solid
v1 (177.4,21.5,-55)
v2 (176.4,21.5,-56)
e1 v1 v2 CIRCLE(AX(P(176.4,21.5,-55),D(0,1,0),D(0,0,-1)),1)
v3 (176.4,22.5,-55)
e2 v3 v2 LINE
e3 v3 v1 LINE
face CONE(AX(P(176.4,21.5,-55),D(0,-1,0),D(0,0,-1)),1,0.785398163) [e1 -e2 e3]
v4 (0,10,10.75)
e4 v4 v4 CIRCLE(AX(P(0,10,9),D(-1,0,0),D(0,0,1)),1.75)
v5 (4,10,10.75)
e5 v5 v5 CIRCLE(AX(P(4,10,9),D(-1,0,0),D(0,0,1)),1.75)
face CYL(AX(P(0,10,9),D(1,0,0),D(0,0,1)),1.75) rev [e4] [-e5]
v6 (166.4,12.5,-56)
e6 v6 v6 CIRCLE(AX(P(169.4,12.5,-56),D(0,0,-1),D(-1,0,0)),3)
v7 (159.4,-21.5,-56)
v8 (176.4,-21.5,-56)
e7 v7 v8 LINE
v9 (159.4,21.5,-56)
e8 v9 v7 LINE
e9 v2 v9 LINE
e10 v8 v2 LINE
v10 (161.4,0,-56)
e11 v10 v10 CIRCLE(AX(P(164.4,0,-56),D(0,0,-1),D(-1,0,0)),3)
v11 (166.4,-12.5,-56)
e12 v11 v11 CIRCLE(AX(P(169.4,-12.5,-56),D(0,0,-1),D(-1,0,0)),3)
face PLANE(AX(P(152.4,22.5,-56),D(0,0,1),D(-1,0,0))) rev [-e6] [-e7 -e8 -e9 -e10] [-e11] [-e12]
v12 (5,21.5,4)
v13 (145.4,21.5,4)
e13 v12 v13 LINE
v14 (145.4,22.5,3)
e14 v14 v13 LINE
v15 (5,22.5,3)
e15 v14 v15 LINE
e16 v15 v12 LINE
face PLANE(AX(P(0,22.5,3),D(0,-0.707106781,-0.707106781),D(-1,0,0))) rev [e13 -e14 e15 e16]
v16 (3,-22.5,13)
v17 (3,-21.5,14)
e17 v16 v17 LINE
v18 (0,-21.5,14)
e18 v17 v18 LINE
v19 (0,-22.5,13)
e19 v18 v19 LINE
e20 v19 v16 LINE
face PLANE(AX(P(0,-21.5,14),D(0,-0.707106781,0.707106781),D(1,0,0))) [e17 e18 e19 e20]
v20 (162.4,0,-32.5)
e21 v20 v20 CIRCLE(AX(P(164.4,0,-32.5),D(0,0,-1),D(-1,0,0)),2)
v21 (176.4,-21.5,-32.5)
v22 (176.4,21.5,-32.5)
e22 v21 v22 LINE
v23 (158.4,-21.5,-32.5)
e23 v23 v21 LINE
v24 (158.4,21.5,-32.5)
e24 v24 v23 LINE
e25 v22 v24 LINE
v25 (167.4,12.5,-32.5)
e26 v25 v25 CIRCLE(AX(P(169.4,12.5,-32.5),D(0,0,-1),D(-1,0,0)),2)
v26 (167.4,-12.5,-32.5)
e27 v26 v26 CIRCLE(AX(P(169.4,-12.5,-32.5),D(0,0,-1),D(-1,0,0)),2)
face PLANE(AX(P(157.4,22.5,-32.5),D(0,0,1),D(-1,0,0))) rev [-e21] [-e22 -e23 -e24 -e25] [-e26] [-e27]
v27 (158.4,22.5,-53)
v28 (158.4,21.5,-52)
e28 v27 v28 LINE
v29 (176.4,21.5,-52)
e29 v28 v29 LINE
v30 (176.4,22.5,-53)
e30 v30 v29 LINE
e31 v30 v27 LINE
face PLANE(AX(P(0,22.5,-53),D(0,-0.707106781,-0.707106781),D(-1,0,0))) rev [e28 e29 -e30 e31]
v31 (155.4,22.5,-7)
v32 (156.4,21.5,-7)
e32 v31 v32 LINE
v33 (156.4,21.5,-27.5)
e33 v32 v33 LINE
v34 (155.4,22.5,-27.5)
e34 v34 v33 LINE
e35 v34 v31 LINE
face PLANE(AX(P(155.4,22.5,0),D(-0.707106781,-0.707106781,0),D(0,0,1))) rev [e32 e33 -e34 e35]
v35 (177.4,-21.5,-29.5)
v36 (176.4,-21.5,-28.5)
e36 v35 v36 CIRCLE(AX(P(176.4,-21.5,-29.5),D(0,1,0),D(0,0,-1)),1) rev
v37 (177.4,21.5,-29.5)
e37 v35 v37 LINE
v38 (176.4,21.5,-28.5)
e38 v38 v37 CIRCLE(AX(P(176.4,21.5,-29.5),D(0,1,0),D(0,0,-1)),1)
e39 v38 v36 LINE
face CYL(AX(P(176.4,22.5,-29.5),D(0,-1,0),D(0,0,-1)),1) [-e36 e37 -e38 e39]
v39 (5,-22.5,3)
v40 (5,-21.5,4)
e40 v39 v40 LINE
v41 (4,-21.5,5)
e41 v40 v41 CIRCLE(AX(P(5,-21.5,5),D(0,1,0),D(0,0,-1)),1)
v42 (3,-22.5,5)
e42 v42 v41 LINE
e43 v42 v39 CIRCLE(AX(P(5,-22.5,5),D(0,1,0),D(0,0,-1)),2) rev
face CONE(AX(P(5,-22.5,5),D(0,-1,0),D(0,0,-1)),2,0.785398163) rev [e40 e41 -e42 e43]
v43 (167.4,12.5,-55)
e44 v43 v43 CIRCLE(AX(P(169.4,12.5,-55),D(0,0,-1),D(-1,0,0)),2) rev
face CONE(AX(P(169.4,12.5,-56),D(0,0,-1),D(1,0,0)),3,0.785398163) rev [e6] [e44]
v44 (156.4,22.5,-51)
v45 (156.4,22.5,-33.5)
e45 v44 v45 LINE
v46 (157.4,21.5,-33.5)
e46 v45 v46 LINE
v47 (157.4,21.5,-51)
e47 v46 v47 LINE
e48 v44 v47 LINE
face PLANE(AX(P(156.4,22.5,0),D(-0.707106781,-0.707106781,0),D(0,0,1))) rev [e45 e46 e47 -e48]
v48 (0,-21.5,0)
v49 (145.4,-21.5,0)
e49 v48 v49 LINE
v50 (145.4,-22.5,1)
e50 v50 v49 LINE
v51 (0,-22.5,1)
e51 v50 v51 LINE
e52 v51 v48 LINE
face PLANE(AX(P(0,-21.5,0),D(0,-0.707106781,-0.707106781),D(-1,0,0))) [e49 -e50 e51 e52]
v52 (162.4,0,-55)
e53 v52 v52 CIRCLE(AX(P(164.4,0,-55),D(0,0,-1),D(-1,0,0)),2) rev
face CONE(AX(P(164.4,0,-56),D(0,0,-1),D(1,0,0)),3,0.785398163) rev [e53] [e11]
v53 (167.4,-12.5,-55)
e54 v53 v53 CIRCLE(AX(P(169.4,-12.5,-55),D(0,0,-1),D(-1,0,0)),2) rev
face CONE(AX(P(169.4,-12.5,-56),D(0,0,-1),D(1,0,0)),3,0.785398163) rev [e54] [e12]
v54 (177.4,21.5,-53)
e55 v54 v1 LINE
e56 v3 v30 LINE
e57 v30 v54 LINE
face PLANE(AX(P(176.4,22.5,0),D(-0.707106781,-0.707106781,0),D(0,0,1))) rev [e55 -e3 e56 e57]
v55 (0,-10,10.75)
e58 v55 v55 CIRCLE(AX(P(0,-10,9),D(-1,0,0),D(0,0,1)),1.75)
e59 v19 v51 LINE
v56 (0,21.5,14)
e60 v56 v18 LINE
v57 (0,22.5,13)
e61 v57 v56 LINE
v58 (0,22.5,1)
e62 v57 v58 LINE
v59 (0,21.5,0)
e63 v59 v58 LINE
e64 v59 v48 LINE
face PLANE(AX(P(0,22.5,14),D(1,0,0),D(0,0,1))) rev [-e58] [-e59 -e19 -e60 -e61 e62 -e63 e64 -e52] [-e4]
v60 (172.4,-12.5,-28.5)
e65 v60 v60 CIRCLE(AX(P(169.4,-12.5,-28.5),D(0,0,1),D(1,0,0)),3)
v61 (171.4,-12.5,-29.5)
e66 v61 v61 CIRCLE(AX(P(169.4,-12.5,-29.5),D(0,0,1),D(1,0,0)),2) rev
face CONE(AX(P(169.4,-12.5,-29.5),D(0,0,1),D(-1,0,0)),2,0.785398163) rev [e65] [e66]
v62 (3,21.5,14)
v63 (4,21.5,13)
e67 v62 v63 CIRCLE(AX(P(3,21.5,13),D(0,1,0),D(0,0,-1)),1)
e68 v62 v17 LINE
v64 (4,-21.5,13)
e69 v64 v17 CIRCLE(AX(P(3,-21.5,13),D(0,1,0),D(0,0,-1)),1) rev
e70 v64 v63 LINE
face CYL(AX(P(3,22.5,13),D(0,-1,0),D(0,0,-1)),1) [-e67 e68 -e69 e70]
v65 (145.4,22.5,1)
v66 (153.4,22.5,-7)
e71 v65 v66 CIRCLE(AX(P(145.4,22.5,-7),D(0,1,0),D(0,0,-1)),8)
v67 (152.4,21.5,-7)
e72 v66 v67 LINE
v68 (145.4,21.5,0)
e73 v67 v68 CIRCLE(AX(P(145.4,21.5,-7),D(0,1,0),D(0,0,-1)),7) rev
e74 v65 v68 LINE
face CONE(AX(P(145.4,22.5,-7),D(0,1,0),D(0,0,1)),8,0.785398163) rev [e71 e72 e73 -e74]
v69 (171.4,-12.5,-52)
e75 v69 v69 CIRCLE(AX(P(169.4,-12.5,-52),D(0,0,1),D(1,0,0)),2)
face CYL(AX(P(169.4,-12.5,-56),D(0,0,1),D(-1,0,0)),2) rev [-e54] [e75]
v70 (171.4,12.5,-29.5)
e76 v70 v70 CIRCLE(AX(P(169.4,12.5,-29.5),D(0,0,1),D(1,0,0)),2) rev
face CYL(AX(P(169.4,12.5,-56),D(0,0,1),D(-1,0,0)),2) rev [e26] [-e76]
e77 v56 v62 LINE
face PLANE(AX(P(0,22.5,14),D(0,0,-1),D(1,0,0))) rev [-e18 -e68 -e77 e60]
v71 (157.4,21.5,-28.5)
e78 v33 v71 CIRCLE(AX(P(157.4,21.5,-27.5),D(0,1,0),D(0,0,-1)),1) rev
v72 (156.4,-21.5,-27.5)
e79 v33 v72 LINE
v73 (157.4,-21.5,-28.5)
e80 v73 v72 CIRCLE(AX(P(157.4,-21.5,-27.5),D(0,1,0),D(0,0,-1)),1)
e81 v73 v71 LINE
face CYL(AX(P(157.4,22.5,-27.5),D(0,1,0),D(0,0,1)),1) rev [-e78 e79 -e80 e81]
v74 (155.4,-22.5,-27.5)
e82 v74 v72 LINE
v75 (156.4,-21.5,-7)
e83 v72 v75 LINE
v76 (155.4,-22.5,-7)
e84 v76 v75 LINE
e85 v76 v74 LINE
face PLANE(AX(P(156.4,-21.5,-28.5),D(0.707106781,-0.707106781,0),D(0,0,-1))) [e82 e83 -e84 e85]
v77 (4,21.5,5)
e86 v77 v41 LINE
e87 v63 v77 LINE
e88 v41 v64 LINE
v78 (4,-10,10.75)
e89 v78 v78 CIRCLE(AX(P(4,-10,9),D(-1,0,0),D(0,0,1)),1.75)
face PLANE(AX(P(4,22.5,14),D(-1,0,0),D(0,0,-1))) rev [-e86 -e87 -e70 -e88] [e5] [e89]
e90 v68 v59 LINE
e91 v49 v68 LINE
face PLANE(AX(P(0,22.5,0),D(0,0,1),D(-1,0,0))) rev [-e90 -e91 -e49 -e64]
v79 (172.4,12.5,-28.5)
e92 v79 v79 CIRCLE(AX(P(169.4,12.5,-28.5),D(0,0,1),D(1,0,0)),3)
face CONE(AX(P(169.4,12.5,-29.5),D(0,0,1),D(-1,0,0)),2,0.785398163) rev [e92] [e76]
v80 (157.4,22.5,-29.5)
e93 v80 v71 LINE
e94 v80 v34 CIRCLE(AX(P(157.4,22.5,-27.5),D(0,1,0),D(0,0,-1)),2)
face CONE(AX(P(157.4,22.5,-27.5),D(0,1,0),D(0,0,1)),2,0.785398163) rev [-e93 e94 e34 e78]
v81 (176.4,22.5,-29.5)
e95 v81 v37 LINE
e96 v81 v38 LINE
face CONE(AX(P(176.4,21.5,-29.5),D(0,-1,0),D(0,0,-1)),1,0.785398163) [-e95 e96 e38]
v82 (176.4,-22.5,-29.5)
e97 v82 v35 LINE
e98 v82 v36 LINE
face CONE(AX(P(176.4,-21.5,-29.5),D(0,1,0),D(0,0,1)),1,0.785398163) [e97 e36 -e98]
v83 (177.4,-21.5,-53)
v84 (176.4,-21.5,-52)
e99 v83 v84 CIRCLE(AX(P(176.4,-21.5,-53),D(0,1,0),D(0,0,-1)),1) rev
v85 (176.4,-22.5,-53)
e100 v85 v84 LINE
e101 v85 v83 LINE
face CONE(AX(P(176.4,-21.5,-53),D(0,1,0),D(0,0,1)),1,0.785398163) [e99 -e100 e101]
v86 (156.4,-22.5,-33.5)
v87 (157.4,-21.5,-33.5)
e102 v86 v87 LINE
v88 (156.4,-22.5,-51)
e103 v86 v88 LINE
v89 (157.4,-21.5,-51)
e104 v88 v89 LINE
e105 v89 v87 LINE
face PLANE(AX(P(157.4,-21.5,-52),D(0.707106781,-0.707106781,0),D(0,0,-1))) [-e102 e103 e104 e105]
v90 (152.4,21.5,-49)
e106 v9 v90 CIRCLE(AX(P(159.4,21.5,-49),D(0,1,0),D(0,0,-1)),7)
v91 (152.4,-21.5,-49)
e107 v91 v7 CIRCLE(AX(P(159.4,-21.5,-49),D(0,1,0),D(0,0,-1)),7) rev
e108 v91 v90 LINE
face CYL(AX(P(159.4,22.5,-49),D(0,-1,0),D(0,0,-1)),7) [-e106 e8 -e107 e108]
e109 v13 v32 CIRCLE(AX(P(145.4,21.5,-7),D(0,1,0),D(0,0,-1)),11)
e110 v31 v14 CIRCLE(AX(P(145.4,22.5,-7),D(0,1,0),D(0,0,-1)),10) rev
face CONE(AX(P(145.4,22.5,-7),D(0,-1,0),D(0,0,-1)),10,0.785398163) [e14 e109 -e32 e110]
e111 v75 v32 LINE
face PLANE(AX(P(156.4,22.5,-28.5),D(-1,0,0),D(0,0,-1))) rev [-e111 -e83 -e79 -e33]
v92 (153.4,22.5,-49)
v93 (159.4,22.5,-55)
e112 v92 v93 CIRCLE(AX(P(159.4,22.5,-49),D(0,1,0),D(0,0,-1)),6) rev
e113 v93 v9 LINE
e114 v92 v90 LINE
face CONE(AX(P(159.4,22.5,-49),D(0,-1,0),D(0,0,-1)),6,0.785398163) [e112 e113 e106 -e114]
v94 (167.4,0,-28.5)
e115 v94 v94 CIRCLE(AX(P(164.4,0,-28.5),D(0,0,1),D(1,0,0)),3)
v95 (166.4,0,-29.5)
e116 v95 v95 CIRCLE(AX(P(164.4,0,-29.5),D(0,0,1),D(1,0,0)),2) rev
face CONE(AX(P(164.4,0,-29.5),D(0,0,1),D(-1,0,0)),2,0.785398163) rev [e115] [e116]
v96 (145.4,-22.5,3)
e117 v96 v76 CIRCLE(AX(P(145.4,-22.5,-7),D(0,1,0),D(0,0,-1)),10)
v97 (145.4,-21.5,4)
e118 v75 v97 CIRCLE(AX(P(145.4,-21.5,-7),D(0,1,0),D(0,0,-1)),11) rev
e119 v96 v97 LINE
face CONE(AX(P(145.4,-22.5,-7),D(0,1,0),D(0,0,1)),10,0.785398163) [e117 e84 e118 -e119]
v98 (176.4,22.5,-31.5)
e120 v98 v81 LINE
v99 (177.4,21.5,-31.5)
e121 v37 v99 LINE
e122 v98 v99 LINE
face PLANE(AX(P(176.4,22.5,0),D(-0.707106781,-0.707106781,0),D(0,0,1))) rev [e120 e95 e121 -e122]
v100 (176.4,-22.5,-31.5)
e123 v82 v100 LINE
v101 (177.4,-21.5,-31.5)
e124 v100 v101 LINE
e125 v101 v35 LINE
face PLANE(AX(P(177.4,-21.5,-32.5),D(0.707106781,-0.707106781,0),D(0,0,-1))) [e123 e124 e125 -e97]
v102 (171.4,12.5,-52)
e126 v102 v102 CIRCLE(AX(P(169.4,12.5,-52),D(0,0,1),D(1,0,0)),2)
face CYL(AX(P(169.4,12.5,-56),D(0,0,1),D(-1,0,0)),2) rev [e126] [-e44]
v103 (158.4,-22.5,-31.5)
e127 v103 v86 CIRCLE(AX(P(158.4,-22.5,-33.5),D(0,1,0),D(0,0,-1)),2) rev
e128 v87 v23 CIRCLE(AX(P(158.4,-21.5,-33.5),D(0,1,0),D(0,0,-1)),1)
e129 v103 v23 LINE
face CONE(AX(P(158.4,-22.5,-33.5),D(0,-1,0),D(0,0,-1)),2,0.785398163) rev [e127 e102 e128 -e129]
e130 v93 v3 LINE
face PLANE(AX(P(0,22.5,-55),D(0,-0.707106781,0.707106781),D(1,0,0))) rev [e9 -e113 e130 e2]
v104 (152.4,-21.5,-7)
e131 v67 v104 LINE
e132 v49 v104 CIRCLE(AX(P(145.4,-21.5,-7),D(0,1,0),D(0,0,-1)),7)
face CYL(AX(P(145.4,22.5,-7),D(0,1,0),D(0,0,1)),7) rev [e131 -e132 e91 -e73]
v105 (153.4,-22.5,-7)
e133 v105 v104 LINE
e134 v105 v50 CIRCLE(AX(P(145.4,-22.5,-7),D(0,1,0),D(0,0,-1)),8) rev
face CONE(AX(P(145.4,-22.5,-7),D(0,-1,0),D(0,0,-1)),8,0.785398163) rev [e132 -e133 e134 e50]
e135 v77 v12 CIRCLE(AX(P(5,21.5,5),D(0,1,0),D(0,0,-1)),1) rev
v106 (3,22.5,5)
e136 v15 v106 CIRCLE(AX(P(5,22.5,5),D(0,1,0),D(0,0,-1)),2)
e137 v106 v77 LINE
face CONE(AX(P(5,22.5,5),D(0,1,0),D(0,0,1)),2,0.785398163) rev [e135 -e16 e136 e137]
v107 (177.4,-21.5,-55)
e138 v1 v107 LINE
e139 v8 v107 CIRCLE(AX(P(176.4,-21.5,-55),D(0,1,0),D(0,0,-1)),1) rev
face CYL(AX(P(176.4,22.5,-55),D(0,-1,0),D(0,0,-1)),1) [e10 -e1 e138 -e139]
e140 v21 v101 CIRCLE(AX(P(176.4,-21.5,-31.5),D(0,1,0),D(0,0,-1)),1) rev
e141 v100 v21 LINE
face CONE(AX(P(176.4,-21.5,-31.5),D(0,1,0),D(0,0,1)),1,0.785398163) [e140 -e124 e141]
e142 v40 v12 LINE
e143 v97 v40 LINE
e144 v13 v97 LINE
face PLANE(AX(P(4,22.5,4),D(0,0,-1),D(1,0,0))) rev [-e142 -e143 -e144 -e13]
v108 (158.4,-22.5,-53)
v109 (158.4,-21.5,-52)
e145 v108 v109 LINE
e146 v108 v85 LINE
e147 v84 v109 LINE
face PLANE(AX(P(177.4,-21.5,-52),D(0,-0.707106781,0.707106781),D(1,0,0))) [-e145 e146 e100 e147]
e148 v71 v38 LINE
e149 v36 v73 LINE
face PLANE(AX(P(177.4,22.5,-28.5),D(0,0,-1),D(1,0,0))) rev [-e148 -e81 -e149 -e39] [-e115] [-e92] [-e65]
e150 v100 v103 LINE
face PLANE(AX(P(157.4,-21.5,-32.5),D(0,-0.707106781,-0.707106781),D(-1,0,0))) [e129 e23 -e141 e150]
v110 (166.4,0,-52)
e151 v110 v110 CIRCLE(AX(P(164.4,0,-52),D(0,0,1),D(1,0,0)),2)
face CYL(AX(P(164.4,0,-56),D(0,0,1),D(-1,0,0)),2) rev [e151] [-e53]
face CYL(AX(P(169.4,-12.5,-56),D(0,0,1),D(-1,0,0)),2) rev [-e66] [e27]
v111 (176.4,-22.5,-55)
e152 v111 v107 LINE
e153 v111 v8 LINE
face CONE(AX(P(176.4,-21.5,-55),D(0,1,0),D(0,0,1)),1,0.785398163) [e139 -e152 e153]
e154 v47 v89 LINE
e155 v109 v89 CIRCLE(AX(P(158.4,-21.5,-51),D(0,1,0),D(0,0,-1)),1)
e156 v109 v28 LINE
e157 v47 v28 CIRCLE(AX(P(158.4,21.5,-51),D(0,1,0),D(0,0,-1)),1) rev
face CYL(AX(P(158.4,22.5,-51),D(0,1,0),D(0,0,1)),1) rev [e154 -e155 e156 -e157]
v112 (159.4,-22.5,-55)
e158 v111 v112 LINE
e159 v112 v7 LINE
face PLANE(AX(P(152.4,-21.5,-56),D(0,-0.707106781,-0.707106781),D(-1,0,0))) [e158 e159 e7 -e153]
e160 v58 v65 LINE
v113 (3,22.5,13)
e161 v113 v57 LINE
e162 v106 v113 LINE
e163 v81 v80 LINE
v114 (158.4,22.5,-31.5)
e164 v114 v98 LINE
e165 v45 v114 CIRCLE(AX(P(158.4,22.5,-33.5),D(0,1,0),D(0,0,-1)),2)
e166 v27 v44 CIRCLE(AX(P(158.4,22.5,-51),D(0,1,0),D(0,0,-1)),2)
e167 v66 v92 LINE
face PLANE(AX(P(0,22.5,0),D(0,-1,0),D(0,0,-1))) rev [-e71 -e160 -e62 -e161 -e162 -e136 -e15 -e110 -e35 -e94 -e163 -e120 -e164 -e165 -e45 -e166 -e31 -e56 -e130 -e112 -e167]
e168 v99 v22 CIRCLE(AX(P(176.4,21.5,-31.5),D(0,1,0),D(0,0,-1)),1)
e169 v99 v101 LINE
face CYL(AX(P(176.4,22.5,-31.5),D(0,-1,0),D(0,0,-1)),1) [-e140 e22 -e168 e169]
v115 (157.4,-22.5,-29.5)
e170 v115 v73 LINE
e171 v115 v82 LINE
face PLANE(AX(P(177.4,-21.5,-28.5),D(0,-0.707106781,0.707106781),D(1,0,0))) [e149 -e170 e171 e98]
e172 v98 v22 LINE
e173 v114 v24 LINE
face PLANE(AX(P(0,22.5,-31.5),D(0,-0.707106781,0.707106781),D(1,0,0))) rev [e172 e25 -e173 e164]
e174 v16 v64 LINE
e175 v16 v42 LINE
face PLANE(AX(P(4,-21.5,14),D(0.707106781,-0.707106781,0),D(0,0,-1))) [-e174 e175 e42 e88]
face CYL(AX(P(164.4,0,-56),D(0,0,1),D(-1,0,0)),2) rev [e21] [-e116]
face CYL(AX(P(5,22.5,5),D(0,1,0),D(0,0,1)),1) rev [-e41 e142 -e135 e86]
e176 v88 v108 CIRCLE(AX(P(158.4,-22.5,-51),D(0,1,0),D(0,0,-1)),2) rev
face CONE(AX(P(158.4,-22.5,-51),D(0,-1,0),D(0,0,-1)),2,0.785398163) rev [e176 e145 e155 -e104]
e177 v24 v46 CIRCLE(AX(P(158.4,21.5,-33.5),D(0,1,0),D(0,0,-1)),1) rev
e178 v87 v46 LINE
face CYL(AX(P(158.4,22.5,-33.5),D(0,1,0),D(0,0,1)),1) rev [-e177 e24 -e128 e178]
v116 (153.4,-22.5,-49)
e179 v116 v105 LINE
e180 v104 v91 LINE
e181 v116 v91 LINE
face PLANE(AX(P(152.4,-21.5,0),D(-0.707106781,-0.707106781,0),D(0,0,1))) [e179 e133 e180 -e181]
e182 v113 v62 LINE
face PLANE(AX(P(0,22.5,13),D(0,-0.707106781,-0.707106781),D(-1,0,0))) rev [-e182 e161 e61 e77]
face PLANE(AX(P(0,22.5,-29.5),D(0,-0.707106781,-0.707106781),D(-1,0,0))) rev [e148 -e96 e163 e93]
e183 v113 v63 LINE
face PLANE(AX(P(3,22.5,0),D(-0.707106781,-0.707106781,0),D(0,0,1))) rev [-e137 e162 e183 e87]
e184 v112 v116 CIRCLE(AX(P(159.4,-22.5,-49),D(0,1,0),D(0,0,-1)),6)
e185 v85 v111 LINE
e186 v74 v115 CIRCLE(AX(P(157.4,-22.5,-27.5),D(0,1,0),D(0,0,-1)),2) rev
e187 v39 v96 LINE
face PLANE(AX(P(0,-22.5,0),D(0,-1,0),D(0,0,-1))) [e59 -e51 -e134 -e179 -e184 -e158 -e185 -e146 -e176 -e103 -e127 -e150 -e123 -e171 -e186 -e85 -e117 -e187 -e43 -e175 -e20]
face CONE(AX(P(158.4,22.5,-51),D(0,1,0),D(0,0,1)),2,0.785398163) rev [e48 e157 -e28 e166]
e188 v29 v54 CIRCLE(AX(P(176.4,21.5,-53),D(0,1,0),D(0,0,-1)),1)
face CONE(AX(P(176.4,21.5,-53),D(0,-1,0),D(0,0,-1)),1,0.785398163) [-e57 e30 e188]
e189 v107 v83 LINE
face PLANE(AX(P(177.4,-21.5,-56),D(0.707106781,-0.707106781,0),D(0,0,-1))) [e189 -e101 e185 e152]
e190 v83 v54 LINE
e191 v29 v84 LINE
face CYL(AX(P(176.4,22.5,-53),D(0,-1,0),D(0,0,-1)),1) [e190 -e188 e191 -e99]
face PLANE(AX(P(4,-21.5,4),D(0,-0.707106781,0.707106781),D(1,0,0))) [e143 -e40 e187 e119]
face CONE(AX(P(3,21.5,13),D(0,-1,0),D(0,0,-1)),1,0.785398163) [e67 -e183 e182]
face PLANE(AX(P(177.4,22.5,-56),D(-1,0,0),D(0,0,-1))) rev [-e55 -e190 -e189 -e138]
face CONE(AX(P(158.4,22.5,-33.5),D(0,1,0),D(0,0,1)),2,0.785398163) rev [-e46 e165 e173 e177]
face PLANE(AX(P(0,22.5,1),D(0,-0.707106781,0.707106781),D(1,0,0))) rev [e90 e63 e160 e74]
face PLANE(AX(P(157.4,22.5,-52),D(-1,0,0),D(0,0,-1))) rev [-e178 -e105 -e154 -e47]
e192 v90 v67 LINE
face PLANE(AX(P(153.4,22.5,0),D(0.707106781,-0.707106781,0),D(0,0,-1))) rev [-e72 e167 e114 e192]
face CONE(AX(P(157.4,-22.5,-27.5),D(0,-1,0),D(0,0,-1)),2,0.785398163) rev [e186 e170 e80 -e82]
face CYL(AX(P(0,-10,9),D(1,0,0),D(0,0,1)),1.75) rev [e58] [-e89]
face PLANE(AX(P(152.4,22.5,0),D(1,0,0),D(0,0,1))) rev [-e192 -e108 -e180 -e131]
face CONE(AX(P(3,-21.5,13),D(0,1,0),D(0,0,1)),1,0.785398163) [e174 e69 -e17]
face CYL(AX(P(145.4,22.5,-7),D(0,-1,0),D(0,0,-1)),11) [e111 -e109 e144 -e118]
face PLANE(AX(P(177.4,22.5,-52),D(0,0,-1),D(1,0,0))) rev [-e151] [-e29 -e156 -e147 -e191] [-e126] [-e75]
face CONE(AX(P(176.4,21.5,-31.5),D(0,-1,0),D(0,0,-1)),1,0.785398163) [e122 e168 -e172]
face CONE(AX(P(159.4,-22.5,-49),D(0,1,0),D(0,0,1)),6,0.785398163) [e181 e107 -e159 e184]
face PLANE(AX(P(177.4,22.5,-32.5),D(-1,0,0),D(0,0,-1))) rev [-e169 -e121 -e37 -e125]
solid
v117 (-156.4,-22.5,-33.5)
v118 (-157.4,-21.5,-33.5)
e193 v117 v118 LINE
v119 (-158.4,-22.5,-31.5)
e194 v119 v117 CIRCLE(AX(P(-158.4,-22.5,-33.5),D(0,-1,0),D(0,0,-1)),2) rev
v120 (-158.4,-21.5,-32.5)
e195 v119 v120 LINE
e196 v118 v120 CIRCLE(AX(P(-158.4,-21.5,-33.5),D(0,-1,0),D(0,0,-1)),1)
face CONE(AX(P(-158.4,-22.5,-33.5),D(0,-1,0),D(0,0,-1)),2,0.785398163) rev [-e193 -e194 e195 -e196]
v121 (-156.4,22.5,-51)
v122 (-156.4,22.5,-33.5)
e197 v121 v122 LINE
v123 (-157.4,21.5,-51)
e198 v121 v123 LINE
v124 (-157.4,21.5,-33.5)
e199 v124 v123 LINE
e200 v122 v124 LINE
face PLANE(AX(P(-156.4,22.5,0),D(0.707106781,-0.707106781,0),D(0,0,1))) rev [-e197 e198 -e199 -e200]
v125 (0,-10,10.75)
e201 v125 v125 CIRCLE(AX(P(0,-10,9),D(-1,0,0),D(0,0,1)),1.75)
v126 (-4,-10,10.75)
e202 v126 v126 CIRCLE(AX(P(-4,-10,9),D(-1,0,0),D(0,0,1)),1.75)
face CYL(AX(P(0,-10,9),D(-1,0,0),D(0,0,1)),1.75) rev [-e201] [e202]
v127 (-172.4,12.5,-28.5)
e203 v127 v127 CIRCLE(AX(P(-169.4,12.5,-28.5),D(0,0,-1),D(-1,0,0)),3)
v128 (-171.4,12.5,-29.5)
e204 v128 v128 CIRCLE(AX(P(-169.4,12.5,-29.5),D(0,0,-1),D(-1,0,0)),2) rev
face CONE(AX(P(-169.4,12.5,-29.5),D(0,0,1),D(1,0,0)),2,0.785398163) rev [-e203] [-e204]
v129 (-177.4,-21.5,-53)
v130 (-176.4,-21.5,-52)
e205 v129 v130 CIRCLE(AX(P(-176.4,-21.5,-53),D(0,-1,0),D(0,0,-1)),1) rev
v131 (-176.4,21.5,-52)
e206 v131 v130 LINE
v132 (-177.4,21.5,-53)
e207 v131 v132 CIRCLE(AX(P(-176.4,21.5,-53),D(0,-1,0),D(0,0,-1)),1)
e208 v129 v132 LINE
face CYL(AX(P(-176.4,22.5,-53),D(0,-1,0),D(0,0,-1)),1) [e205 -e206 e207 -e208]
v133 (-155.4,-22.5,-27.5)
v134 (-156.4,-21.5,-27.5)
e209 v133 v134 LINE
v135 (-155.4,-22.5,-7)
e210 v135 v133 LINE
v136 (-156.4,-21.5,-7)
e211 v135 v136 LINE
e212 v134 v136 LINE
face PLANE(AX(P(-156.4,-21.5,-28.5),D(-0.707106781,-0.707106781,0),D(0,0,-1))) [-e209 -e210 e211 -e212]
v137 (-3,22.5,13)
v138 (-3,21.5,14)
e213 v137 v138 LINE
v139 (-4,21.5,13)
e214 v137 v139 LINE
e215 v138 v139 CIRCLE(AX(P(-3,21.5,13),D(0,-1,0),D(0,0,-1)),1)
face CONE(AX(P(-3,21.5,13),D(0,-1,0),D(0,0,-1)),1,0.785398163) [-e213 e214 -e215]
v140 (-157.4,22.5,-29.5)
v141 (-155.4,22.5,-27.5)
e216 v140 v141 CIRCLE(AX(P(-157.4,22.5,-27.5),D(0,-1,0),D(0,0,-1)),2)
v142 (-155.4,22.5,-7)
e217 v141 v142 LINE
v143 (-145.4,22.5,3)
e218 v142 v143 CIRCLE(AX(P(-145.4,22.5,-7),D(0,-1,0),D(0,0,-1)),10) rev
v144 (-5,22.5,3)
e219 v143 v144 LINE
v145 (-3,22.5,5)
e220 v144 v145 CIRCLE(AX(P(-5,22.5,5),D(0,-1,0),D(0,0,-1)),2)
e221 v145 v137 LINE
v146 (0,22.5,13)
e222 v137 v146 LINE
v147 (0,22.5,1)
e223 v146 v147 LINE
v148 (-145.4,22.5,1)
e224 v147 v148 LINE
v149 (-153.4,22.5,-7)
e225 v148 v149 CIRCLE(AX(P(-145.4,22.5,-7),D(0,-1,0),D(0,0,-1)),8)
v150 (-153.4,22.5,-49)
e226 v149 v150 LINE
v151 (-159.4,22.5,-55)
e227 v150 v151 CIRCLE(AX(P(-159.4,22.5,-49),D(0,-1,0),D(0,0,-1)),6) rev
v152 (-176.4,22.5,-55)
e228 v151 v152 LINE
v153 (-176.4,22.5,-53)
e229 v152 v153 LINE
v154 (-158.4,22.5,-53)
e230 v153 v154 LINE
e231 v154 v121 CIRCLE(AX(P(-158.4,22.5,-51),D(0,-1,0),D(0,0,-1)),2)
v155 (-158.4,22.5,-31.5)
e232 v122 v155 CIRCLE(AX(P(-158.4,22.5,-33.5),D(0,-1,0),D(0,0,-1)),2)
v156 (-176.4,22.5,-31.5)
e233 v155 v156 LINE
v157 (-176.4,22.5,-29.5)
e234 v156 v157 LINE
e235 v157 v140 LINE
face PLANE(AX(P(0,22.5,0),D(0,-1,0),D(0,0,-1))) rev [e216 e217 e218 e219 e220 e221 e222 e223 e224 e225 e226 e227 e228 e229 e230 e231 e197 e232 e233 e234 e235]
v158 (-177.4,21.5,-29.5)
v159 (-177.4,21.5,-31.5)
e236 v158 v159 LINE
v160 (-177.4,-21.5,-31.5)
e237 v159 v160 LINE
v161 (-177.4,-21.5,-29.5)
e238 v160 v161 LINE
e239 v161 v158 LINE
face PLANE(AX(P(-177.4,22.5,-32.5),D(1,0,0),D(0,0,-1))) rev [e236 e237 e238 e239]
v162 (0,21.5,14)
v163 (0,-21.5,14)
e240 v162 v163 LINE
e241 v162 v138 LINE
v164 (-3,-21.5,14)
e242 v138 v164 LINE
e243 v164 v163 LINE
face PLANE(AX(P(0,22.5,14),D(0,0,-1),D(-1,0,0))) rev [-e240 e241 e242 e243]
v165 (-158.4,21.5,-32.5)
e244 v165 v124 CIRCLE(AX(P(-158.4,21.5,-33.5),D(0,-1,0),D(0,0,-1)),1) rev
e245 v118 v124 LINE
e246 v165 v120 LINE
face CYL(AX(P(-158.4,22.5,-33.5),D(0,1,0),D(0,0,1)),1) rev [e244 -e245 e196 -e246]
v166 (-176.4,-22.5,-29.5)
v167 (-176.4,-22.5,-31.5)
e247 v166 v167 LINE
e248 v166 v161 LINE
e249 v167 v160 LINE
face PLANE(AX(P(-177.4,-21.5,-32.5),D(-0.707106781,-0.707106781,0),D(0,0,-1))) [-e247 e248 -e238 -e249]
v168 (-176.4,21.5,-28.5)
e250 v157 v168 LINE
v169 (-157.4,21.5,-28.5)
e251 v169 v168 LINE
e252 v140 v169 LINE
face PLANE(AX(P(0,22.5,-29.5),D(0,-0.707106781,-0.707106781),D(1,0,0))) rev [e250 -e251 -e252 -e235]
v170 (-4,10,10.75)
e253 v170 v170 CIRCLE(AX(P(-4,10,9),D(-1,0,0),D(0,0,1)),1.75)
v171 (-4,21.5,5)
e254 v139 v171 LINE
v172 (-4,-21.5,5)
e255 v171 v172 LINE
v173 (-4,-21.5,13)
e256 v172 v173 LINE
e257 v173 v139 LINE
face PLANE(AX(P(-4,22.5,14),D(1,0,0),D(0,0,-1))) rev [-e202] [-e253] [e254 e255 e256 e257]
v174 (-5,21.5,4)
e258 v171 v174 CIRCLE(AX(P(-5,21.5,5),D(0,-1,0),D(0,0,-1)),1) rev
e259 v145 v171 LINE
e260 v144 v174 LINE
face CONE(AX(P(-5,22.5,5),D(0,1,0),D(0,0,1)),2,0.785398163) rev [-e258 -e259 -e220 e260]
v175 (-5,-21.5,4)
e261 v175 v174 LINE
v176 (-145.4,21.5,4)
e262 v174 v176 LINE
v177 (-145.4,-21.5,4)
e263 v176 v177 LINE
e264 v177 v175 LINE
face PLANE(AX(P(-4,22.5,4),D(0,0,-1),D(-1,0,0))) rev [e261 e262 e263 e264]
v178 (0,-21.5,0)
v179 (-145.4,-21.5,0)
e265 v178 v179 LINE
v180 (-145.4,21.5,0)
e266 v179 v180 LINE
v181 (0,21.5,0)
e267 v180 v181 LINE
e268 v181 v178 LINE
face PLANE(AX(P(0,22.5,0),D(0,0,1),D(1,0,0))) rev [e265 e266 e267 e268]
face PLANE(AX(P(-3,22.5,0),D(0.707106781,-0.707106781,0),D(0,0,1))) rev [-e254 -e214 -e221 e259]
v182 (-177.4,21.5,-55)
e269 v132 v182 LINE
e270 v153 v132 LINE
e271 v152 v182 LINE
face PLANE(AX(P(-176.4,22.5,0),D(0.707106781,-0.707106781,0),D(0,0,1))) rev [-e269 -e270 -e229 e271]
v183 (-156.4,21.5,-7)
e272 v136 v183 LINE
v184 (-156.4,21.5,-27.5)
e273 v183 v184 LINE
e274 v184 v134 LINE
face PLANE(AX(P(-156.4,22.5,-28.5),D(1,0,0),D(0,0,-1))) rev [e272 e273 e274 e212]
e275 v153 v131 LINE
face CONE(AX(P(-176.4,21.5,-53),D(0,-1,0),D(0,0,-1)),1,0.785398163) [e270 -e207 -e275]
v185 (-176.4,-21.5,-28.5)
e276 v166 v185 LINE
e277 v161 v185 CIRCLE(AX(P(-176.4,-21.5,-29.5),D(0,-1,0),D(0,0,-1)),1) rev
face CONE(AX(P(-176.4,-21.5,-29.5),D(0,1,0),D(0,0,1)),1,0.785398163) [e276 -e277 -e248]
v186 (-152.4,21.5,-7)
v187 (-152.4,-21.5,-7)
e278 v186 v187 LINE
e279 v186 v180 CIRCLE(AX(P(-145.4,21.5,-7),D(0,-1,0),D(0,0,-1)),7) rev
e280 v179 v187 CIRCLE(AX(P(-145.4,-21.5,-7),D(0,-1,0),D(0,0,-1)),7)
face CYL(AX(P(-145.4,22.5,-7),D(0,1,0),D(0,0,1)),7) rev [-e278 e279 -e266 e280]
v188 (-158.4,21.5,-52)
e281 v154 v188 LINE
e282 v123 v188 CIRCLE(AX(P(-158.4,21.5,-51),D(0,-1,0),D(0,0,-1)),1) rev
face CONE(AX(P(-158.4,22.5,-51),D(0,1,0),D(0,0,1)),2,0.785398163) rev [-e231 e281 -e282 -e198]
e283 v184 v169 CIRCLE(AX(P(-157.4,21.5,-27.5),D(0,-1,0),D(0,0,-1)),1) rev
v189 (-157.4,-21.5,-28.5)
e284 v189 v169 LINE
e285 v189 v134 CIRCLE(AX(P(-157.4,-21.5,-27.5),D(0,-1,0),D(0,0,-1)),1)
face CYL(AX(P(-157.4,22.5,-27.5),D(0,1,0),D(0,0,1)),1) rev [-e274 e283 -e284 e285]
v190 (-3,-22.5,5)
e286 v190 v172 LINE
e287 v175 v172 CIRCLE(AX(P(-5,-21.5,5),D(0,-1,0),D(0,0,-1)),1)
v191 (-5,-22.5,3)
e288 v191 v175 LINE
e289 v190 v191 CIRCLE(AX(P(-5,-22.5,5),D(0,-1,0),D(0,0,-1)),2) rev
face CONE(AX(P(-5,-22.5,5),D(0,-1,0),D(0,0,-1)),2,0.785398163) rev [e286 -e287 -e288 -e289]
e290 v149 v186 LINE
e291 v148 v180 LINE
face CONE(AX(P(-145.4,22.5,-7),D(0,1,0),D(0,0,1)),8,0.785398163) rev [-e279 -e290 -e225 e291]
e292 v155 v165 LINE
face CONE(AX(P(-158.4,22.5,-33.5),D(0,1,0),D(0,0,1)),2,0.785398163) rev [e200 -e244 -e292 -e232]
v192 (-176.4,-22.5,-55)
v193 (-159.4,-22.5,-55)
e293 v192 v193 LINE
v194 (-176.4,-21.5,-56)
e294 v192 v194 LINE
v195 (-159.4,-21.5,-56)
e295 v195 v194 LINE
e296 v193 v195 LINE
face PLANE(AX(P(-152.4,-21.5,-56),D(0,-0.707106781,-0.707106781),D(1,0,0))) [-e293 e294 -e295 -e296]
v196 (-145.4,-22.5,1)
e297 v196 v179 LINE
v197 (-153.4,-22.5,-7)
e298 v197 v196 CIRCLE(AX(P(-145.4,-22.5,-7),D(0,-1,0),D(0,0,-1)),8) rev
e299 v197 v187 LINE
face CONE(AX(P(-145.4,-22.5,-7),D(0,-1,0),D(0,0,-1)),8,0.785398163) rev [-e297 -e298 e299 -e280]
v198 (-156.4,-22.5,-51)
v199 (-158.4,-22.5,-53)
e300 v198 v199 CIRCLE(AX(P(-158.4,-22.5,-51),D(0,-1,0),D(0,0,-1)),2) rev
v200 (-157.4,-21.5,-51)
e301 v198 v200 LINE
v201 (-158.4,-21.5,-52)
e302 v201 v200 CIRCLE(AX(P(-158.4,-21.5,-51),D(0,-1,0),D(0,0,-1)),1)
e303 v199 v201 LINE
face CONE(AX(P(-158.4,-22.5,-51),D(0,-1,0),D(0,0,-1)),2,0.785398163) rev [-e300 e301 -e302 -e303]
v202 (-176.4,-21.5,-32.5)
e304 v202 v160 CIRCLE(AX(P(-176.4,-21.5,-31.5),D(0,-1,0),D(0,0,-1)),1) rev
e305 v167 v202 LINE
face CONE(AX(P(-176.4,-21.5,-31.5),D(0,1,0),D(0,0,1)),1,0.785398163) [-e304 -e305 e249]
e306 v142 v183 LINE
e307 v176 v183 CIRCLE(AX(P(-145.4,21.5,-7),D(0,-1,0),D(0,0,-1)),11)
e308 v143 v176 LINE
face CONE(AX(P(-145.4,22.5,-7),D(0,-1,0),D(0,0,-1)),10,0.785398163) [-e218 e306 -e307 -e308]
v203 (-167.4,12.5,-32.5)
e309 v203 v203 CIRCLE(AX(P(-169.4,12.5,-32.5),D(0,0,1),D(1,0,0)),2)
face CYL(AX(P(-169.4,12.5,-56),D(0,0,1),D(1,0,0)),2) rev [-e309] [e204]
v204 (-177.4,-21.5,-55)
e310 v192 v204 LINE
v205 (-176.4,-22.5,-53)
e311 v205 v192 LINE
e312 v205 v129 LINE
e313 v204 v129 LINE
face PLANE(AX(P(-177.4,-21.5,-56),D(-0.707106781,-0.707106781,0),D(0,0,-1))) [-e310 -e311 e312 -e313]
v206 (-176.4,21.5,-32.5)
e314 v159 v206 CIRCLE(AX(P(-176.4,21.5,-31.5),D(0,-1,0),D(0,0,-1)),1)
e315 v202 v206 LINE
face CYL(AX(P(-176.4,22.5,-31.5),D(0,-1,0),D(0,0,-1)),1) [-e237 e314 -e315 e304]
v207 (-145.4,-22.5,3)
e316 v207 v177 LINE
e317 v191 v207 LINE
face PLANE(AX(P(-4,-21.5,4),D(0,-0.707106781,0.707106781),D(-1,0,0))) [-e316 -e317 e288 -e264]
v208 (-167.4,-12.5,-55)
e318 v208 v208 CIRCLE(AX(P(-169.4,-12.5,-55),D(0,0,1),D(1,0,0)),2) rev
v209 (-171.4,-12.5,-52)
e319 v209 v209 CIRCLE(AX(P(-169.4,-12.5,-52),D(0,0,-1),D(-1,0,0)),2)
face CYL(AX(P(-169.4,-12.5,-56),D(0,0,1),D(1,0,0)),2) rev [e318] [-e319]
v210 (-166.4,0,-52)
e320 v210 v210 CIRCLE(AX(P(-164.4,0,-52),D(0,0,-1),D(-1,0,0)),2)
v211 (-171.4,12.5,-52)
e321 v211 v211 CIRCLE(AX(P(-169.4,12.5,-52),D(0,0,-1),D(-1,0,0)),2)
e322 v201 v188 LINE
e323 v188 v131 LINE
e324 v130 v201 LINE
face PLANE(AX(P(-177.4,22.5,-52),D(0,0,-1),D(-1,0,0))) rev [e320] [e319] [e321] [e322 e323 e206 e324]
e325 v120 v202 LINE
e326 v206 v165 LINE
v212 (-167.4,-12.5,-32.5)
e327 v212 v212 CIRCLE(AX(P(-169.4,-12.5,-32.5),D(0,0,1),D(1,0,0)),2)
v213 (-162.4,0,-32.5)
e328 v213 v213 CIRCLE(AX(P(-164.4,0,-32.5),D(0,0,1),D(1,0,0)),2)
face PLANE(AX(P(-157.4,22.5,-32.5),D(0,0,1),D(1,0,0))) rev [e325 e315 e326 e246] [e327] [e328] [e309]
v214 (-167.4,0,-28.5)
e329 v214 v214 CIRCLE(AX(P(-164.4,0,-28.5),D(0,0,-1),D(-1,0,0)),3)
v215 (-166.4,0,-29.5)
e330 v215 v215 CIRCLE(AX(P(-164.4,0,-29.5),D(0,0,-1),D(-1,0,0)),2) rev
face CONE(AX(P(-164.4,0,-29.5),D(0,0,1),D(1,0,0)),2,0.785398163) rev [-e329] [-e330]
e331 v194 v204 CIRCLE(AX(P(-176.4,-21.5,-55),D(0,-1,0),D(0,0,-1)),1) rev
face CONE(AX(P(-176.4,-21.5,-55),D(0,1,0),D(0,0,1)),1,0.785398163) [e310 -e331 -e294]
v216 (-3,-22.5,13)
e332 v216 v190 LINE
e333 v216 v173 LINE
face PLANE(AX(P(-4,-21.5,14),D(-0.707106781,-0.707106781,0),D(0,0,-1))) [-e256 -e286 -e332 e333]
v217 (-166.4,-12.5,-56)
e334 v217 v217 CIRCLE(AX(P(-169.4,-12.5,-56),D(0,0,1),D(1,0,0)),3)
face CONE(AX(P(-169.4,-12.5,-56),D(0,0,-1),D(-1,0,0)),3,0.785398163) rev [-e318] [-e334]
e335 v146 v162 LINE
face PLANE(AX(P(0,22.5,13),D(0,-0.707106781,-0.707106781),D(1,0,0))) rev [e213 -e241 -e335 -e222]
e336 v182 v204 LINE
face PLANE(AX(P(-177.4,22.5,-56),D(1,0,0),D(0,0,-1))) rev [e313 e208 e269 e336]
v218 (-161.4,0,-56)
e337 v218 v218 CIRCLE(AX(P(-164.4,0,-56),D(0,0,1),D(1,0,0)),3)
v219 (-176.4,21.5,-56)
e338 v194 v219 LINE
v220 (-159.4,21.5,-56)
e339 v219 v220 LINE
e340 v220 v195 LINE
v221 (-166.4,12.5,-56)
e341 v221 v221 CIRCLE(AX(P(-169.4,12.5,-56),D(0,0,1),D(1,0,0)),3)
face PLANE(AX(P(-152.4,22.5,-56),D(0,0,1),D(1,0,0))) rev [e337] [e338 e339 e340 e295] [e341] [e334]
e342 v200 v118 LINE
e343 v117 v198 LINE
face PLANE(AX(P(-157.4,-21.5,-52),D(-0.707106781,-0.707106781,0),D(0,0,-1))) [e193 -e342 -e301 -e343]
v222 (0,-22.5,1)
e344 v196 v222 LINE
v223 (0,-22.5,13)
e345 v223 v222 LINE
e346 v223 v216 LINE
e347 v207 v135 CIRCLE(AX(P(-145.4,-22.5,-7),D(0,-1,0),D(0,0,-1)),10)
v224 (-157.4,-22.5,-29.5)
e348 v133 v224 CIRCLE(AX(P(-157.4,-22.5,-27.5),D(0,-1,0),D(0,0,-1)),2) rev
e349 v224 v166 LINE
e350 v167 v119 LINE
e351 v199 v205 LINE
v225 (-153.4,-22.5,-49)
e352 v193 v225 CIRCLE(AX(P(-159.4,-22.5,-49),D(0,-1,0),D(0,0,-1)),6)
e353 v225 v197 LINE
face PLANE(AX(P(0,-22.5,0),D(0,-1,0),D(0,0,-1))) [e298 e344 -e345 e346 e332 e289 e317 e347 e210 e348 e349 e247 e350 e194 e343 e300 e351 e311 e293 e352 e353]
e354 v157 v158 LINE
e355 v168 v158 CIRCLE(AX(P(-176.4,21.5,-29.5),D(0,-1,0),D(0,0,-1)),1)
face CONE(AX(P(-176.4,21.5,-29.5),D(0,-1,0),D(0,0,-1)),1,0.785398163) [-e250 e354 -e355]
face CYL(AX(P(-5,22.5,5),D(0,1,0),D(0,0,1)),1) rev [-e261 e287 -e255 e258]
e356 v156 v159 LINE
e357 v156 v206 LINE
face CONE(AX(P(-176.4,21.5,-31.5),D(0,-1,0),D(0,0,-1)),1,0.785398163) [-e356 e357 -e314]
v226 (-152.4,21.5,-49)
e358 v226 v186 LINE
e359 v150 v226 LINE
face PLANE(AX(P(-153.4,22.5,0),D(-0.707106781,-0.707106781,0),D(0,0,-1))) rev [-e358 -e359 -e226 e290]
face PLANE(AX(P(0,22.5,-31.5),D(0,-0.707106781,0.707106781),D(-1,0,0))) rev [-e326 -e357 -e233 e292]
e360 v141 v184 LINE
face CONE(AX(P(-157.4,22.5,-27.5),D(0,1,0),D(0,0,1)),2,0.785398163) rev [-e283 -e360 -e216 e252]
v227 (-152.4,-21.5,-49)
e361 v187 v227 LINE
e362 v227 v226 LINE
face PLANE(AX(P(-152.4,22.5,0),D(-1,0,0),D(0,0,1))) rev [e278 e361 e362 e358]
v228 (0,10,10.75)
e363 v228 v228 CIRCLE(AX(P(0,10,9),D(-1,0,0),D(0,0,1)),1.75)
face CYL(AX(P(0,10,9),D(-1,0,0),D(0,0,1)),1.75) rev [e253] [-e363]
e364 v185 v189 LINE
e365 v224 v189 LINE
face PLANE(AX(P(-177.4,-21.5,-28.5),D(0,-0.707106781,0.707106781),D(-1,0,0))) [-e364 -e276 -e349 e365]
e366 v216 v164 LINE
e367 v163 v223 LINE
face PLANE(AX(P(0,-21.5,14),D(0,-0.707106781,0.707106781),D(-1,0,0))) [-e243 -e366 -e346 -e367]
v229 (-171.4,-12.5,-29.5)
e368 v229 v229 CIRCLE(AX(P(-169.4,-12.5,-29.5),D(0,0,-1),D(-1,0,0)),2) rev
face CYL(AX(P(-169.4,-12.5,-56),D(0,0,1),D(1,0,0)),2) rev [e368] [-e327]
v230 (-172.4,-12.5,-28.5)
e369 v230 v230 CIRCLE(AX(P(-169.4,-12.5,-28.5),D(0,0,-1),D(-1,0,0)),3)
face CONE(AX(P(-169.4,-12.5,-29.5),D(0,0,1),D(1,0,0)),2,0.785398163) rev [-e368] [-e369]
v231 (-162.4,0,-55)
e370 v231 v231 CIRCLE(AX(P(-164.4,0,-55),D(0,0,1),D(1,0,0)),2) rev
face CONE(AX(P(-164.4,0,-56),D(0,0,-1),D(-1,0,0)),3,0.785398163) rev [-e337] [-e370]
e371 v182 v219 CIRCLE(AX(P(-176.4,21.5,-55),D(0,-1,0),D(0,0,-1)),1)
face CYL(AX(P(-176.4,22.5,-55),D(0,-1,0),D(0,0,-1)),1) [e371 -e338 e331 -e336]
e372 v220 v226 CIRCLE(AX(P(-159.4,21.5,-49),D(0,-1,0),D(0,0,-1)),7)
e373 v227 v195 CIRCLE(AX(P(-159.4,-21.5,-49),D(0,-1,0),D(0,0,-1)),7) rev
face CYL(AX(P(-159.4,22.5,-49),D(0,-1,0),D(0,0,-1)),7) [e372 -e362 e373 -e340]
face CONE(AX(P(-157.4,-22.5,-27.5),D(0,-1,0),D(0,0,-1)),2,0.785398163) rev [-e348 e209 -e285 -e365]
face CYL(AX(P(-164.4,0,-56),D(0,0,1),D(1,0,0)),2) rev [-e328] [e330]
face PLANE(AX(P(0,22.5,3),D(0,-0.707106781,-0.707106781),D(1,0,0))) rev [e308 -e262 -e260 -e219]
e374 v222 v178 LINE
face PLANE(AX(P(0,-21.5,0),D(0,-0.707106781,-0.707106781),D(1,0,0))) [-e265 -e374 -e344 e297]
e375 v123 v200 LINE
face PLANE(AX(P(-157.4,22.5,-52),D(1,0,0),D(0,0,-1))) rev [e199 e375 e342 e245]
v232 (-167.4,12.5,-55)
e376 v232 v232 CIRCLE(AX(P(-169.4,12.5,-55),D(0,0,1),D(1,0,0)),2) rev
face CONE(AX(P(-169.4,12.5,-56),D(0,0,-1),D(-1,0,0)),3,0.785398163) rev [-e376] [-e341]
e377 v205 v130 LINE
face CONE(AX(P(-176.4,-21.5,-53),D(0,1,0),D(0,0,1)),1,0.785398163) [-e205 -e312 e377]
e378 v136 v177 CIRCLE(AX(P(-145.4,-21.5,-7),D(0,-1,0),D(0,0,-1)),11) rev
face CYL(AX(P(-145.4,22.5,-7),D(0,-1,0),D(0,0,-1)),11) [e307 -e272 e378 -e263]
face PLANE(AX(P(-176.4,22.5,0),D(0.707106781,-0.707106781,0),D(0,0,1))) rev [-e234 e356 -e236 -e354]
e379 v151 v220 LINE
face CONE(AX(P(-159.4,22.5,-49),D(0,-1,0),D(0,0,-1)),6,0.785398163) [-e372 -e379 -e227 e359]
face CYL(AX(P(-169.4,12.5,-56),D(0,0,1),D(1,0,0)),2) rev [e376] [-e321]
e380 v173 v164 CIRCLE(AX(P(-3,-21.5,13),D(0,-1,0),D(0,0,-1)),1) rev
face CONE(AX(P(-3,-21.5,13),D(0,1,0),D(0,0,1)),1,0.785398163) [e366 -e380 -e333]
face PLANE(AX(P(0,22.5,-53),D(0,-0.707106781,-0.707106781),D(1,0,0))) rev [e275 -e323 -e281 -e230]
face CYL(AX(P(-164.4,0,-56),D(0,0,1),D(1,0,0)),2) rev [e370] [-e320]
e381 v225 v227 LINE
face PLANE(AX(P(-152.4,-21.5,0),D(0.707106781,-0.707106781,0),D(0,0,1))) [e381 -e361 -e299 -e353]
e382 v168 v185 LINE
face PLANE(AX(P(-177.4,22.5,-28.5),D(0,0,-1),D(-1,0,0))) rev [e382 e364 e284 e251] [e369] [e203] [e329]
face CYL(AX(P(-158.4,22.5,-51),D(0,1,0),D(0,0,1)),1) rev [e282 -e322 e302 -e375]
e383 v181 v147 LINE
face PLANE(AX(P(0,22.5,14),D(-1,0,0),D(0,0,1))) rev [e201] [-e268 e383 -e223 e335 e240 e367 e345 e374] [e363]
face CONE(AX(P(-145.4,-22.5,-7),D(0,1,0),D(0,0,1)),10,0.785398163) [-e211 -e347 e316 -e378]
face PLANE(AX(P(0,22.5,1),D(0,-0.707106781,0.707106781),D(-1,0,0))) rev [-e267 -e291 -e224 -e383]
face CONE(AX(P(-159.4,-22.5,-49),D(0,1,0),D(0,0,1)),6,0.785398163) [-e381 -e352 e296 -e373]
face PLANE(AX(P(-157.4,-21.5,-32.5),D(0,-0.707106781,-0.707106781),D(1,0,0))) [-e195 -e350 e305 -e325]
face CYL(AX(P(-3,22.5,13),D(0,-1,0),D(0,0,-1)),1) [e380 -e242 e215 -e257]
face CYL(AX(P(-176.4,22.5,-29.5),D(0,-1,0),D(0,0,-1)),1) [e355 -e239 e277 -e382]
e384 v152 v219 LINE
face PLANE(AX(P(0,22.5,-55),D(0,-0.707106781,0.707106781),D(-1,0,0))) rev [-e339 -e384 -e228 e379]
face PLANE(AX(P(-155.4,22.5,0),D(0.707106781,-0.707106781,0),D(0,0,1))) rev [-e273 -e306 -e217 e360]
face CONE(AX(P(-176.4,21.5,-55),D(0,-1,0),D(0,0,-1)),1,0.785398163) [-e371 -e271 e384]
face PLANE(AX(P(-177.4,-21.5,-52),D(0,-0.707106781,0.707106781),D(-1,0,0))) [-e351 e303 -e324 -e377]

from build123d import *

# Parameters (mm, degrees)
BOSS_EXTRUDE1_DEPTH = 22.5
SKETCH4_R           = 2
CUT_EXTRUDE1_DEPTH  = 184.802230672
SKETCH5_R           = 1.75
CUT_EXTRUDE2_DEPTH  = 184.6023148
FILLET1_R           = 7
FILLET3_R           = 11
FILLET2_R           = 1
CHAMFER1_SIZE       = 1
CHAMFER2_SIZE       = 1


with BuildPart() as part:
    # Sketch1 → Boss-Extrude1 (new, symmetric)
    with BuildSketch(Plane(origin=(0, 0, 0), x_dir=(1, 0, 0), z_dir=(0, 1, 0))):
        Polygon((-152.4, 0), (-152.4, 56), (-177.4, 56), (-177.4, 52), (-157.4, 52), (-157.4, 32.5), (-177.4, 32.5), (-177.4, 28.5), (-156.4, 28.5), (-156.4, -4), (-4, -4), (-4, -14), (0, -14), (0, 0), align=None)
    extrude(amount=BOSS_EXTRUDE1_DEPTH, both=True)

    # Sketch4 → Cut-Extrude1 (cut, through all)
    with BuildSketch(Plane.XY.offset(-28.5)):
        with Locations((-164.4, 0)):
            Circle(SKETCH4_R)
        with Locations((-169.4, 12.5)):
            Circle(SKETCH4_R)
        with Locations((-169.4, -12.5)):
            Circle(SKETCH4_R)
    extrude(amount=-CUT_EXTRUDE1_DEPTH, mode=Mode.SUBTRACT)

    # Sketch5 → Cut-Extrude2 (cut, through all)
    with BuildSketch(Plane.ZY.offset(4)):
        with Locations((9, 10)):
            Circle(SKETCH5_R)
        with Locations((9, -10)):
            Circle(SKETCH5_R)
    extrude(amount=-CUT_EXTRUDE2_DEPTH, mode=Mode.SUBTRACT)

    # Fillet1
    fillet1_edges = [part.edges().sort_by_distance(p)[0] for p in [
        (-152.4, 0, -56),
        (-152.4, 0, 0),
    ]]
    fillet(fillet1_edges, radius=FILLET1_R)

    # Fillet3
    fillet3_edges = [part.edges().sort_by_distance(p)[0] for p in [
        (-156.4, 0, 4),
    ]]
    fillet(fillet3_edges, radius=FILLET3_R)

    # Fillet2
    fillet2_edges = [part.edges().sort_by_distance(p)[0] for p in [
        (-4, 0, 14),
        (-4, 0, 4),
        (-156.4, 0, -28.5),
        (-177.4, 0, -28.5),
        (-177.4, 0, -32.5),
        (-157.4, 0, -32.5),
        (-157.4, 0, -52),
        (-177.4, 0, -52),
        (-177.4, 0, -56),
    ]]
    fillet(fillet2_edges, radius=FILLET2_R)

    # Chamfer1
    chamfer1_edges = [part.edges().sort_by_distance(p)[0] for p in [
        (-156.4, 22.5, -17.25),
        (-156.692893219, 22.5, -28.207106781),
        (-166.9, 22.5, -28.5),
        (-177.107106781, 22.5, -28.792893219),
        (-177.4, 22.5, -30.5),
        (-177.107106781, 22.5, -32.207106781),
        (-167.4, 22.5, -32.5),
        (-157.692893219, 22.5, -32.792893219),
        (-157.4, 22.5, -42.25),
        (-157.692893219, 22.5, -51.707106781),
        (-167.4, 22.5, -52),
        (-177.107106781, 22.5, -52.292893219),
        (-152.4, 22.5, -28),
        (-177.4, 22.5, -54),
        (-154.450252532, 22.5, -53.949747468),
        (-177.107106781, 22.5, -55.707106781),
        (-167.9, 22.5, -56),
        (-72.7, 22.5, 0),
        (-150.349747468, 22.5, -2.050252532),
        (-75.2, 22.5, 4),
        (-1.5, 22.5, 14),
        (-3.707106781, 22.5, 13.707106781),
        (-4, 22.5, 9),
        (-4.292893219, 22.5, 4.292893219),
        (-153.178174593, 22.5, 0.778174593),
        (-72.7, -22.5, 0),
        (-150.349747468, -22.5, -2.050252532),
        (-152.4, -22.5, -28),
        (-154.450252532, -22.5, -53.949747468),
        (-167.9, -22.5, -56),
        (-177.107106781, -22.5, -55.707106781),
        (-177.4, -22.5, -54),
        (-177.107106781, -22.5, -52.292893219),
        (-167.4, -22.5, -52),
        (-157.692893219, -22.5, -51.707106781),
        (-157.4, -22.5, -42.25),
        (-157.692893219, -22.5, -32.792893219),
        (-167.4, -22.5, -32.5),
        (-177.107106781, -22.5, -32.207106781),
        (-177.4, -22.5, -30.5),
        (-177.107106781, -22.5, -28.792893219),
        (-166.9, -22.5, -28.5),
        (-1.5, -22.5, 14),
        (-156.692893219, -22.5, -28.207106781),
        (-3.707106781, -22.5, 13.707106781),
        (-156.4, -22.5, -17.25),
        (-4, -22.5, 9),
        (-153.178174593, -22.5, 0.778174593),
        (-4.292893219, -22.5, 4.292893219),
        (-75.2, -22.5, 4),
    ]]
    chamfer(chamfer1_edges, length=CHAMFER1_SIZE - 0.0001)  # a hair under: the kernel refuses the full size

    # Chamfer2
    chamfer2_edges = [part.edges().sort_by_distance(p)[0] for p in [
        (-166.4, 0, -56),
        (-166.4, 0, -28.5),
        (-171.4, 12.5, -56),
        (-171.4, 12.5, -28.5),
        (-171.4, -12.5, -56),
        (-171.4, -12.5, -28.5),
    ]]
    chamfer(chamfer2_edges, length=CHAMFER2_SIZE)


with BuildPart() as body_2:
    # Mirror1: mirrored copy
    add(part.part.mirror(Plane(origin=(0, 22.5, 14), x_dir=(0, 0, 1), z_dir=(-1, 0, 0))))


solid = Compound([part.part, body_2.part])
